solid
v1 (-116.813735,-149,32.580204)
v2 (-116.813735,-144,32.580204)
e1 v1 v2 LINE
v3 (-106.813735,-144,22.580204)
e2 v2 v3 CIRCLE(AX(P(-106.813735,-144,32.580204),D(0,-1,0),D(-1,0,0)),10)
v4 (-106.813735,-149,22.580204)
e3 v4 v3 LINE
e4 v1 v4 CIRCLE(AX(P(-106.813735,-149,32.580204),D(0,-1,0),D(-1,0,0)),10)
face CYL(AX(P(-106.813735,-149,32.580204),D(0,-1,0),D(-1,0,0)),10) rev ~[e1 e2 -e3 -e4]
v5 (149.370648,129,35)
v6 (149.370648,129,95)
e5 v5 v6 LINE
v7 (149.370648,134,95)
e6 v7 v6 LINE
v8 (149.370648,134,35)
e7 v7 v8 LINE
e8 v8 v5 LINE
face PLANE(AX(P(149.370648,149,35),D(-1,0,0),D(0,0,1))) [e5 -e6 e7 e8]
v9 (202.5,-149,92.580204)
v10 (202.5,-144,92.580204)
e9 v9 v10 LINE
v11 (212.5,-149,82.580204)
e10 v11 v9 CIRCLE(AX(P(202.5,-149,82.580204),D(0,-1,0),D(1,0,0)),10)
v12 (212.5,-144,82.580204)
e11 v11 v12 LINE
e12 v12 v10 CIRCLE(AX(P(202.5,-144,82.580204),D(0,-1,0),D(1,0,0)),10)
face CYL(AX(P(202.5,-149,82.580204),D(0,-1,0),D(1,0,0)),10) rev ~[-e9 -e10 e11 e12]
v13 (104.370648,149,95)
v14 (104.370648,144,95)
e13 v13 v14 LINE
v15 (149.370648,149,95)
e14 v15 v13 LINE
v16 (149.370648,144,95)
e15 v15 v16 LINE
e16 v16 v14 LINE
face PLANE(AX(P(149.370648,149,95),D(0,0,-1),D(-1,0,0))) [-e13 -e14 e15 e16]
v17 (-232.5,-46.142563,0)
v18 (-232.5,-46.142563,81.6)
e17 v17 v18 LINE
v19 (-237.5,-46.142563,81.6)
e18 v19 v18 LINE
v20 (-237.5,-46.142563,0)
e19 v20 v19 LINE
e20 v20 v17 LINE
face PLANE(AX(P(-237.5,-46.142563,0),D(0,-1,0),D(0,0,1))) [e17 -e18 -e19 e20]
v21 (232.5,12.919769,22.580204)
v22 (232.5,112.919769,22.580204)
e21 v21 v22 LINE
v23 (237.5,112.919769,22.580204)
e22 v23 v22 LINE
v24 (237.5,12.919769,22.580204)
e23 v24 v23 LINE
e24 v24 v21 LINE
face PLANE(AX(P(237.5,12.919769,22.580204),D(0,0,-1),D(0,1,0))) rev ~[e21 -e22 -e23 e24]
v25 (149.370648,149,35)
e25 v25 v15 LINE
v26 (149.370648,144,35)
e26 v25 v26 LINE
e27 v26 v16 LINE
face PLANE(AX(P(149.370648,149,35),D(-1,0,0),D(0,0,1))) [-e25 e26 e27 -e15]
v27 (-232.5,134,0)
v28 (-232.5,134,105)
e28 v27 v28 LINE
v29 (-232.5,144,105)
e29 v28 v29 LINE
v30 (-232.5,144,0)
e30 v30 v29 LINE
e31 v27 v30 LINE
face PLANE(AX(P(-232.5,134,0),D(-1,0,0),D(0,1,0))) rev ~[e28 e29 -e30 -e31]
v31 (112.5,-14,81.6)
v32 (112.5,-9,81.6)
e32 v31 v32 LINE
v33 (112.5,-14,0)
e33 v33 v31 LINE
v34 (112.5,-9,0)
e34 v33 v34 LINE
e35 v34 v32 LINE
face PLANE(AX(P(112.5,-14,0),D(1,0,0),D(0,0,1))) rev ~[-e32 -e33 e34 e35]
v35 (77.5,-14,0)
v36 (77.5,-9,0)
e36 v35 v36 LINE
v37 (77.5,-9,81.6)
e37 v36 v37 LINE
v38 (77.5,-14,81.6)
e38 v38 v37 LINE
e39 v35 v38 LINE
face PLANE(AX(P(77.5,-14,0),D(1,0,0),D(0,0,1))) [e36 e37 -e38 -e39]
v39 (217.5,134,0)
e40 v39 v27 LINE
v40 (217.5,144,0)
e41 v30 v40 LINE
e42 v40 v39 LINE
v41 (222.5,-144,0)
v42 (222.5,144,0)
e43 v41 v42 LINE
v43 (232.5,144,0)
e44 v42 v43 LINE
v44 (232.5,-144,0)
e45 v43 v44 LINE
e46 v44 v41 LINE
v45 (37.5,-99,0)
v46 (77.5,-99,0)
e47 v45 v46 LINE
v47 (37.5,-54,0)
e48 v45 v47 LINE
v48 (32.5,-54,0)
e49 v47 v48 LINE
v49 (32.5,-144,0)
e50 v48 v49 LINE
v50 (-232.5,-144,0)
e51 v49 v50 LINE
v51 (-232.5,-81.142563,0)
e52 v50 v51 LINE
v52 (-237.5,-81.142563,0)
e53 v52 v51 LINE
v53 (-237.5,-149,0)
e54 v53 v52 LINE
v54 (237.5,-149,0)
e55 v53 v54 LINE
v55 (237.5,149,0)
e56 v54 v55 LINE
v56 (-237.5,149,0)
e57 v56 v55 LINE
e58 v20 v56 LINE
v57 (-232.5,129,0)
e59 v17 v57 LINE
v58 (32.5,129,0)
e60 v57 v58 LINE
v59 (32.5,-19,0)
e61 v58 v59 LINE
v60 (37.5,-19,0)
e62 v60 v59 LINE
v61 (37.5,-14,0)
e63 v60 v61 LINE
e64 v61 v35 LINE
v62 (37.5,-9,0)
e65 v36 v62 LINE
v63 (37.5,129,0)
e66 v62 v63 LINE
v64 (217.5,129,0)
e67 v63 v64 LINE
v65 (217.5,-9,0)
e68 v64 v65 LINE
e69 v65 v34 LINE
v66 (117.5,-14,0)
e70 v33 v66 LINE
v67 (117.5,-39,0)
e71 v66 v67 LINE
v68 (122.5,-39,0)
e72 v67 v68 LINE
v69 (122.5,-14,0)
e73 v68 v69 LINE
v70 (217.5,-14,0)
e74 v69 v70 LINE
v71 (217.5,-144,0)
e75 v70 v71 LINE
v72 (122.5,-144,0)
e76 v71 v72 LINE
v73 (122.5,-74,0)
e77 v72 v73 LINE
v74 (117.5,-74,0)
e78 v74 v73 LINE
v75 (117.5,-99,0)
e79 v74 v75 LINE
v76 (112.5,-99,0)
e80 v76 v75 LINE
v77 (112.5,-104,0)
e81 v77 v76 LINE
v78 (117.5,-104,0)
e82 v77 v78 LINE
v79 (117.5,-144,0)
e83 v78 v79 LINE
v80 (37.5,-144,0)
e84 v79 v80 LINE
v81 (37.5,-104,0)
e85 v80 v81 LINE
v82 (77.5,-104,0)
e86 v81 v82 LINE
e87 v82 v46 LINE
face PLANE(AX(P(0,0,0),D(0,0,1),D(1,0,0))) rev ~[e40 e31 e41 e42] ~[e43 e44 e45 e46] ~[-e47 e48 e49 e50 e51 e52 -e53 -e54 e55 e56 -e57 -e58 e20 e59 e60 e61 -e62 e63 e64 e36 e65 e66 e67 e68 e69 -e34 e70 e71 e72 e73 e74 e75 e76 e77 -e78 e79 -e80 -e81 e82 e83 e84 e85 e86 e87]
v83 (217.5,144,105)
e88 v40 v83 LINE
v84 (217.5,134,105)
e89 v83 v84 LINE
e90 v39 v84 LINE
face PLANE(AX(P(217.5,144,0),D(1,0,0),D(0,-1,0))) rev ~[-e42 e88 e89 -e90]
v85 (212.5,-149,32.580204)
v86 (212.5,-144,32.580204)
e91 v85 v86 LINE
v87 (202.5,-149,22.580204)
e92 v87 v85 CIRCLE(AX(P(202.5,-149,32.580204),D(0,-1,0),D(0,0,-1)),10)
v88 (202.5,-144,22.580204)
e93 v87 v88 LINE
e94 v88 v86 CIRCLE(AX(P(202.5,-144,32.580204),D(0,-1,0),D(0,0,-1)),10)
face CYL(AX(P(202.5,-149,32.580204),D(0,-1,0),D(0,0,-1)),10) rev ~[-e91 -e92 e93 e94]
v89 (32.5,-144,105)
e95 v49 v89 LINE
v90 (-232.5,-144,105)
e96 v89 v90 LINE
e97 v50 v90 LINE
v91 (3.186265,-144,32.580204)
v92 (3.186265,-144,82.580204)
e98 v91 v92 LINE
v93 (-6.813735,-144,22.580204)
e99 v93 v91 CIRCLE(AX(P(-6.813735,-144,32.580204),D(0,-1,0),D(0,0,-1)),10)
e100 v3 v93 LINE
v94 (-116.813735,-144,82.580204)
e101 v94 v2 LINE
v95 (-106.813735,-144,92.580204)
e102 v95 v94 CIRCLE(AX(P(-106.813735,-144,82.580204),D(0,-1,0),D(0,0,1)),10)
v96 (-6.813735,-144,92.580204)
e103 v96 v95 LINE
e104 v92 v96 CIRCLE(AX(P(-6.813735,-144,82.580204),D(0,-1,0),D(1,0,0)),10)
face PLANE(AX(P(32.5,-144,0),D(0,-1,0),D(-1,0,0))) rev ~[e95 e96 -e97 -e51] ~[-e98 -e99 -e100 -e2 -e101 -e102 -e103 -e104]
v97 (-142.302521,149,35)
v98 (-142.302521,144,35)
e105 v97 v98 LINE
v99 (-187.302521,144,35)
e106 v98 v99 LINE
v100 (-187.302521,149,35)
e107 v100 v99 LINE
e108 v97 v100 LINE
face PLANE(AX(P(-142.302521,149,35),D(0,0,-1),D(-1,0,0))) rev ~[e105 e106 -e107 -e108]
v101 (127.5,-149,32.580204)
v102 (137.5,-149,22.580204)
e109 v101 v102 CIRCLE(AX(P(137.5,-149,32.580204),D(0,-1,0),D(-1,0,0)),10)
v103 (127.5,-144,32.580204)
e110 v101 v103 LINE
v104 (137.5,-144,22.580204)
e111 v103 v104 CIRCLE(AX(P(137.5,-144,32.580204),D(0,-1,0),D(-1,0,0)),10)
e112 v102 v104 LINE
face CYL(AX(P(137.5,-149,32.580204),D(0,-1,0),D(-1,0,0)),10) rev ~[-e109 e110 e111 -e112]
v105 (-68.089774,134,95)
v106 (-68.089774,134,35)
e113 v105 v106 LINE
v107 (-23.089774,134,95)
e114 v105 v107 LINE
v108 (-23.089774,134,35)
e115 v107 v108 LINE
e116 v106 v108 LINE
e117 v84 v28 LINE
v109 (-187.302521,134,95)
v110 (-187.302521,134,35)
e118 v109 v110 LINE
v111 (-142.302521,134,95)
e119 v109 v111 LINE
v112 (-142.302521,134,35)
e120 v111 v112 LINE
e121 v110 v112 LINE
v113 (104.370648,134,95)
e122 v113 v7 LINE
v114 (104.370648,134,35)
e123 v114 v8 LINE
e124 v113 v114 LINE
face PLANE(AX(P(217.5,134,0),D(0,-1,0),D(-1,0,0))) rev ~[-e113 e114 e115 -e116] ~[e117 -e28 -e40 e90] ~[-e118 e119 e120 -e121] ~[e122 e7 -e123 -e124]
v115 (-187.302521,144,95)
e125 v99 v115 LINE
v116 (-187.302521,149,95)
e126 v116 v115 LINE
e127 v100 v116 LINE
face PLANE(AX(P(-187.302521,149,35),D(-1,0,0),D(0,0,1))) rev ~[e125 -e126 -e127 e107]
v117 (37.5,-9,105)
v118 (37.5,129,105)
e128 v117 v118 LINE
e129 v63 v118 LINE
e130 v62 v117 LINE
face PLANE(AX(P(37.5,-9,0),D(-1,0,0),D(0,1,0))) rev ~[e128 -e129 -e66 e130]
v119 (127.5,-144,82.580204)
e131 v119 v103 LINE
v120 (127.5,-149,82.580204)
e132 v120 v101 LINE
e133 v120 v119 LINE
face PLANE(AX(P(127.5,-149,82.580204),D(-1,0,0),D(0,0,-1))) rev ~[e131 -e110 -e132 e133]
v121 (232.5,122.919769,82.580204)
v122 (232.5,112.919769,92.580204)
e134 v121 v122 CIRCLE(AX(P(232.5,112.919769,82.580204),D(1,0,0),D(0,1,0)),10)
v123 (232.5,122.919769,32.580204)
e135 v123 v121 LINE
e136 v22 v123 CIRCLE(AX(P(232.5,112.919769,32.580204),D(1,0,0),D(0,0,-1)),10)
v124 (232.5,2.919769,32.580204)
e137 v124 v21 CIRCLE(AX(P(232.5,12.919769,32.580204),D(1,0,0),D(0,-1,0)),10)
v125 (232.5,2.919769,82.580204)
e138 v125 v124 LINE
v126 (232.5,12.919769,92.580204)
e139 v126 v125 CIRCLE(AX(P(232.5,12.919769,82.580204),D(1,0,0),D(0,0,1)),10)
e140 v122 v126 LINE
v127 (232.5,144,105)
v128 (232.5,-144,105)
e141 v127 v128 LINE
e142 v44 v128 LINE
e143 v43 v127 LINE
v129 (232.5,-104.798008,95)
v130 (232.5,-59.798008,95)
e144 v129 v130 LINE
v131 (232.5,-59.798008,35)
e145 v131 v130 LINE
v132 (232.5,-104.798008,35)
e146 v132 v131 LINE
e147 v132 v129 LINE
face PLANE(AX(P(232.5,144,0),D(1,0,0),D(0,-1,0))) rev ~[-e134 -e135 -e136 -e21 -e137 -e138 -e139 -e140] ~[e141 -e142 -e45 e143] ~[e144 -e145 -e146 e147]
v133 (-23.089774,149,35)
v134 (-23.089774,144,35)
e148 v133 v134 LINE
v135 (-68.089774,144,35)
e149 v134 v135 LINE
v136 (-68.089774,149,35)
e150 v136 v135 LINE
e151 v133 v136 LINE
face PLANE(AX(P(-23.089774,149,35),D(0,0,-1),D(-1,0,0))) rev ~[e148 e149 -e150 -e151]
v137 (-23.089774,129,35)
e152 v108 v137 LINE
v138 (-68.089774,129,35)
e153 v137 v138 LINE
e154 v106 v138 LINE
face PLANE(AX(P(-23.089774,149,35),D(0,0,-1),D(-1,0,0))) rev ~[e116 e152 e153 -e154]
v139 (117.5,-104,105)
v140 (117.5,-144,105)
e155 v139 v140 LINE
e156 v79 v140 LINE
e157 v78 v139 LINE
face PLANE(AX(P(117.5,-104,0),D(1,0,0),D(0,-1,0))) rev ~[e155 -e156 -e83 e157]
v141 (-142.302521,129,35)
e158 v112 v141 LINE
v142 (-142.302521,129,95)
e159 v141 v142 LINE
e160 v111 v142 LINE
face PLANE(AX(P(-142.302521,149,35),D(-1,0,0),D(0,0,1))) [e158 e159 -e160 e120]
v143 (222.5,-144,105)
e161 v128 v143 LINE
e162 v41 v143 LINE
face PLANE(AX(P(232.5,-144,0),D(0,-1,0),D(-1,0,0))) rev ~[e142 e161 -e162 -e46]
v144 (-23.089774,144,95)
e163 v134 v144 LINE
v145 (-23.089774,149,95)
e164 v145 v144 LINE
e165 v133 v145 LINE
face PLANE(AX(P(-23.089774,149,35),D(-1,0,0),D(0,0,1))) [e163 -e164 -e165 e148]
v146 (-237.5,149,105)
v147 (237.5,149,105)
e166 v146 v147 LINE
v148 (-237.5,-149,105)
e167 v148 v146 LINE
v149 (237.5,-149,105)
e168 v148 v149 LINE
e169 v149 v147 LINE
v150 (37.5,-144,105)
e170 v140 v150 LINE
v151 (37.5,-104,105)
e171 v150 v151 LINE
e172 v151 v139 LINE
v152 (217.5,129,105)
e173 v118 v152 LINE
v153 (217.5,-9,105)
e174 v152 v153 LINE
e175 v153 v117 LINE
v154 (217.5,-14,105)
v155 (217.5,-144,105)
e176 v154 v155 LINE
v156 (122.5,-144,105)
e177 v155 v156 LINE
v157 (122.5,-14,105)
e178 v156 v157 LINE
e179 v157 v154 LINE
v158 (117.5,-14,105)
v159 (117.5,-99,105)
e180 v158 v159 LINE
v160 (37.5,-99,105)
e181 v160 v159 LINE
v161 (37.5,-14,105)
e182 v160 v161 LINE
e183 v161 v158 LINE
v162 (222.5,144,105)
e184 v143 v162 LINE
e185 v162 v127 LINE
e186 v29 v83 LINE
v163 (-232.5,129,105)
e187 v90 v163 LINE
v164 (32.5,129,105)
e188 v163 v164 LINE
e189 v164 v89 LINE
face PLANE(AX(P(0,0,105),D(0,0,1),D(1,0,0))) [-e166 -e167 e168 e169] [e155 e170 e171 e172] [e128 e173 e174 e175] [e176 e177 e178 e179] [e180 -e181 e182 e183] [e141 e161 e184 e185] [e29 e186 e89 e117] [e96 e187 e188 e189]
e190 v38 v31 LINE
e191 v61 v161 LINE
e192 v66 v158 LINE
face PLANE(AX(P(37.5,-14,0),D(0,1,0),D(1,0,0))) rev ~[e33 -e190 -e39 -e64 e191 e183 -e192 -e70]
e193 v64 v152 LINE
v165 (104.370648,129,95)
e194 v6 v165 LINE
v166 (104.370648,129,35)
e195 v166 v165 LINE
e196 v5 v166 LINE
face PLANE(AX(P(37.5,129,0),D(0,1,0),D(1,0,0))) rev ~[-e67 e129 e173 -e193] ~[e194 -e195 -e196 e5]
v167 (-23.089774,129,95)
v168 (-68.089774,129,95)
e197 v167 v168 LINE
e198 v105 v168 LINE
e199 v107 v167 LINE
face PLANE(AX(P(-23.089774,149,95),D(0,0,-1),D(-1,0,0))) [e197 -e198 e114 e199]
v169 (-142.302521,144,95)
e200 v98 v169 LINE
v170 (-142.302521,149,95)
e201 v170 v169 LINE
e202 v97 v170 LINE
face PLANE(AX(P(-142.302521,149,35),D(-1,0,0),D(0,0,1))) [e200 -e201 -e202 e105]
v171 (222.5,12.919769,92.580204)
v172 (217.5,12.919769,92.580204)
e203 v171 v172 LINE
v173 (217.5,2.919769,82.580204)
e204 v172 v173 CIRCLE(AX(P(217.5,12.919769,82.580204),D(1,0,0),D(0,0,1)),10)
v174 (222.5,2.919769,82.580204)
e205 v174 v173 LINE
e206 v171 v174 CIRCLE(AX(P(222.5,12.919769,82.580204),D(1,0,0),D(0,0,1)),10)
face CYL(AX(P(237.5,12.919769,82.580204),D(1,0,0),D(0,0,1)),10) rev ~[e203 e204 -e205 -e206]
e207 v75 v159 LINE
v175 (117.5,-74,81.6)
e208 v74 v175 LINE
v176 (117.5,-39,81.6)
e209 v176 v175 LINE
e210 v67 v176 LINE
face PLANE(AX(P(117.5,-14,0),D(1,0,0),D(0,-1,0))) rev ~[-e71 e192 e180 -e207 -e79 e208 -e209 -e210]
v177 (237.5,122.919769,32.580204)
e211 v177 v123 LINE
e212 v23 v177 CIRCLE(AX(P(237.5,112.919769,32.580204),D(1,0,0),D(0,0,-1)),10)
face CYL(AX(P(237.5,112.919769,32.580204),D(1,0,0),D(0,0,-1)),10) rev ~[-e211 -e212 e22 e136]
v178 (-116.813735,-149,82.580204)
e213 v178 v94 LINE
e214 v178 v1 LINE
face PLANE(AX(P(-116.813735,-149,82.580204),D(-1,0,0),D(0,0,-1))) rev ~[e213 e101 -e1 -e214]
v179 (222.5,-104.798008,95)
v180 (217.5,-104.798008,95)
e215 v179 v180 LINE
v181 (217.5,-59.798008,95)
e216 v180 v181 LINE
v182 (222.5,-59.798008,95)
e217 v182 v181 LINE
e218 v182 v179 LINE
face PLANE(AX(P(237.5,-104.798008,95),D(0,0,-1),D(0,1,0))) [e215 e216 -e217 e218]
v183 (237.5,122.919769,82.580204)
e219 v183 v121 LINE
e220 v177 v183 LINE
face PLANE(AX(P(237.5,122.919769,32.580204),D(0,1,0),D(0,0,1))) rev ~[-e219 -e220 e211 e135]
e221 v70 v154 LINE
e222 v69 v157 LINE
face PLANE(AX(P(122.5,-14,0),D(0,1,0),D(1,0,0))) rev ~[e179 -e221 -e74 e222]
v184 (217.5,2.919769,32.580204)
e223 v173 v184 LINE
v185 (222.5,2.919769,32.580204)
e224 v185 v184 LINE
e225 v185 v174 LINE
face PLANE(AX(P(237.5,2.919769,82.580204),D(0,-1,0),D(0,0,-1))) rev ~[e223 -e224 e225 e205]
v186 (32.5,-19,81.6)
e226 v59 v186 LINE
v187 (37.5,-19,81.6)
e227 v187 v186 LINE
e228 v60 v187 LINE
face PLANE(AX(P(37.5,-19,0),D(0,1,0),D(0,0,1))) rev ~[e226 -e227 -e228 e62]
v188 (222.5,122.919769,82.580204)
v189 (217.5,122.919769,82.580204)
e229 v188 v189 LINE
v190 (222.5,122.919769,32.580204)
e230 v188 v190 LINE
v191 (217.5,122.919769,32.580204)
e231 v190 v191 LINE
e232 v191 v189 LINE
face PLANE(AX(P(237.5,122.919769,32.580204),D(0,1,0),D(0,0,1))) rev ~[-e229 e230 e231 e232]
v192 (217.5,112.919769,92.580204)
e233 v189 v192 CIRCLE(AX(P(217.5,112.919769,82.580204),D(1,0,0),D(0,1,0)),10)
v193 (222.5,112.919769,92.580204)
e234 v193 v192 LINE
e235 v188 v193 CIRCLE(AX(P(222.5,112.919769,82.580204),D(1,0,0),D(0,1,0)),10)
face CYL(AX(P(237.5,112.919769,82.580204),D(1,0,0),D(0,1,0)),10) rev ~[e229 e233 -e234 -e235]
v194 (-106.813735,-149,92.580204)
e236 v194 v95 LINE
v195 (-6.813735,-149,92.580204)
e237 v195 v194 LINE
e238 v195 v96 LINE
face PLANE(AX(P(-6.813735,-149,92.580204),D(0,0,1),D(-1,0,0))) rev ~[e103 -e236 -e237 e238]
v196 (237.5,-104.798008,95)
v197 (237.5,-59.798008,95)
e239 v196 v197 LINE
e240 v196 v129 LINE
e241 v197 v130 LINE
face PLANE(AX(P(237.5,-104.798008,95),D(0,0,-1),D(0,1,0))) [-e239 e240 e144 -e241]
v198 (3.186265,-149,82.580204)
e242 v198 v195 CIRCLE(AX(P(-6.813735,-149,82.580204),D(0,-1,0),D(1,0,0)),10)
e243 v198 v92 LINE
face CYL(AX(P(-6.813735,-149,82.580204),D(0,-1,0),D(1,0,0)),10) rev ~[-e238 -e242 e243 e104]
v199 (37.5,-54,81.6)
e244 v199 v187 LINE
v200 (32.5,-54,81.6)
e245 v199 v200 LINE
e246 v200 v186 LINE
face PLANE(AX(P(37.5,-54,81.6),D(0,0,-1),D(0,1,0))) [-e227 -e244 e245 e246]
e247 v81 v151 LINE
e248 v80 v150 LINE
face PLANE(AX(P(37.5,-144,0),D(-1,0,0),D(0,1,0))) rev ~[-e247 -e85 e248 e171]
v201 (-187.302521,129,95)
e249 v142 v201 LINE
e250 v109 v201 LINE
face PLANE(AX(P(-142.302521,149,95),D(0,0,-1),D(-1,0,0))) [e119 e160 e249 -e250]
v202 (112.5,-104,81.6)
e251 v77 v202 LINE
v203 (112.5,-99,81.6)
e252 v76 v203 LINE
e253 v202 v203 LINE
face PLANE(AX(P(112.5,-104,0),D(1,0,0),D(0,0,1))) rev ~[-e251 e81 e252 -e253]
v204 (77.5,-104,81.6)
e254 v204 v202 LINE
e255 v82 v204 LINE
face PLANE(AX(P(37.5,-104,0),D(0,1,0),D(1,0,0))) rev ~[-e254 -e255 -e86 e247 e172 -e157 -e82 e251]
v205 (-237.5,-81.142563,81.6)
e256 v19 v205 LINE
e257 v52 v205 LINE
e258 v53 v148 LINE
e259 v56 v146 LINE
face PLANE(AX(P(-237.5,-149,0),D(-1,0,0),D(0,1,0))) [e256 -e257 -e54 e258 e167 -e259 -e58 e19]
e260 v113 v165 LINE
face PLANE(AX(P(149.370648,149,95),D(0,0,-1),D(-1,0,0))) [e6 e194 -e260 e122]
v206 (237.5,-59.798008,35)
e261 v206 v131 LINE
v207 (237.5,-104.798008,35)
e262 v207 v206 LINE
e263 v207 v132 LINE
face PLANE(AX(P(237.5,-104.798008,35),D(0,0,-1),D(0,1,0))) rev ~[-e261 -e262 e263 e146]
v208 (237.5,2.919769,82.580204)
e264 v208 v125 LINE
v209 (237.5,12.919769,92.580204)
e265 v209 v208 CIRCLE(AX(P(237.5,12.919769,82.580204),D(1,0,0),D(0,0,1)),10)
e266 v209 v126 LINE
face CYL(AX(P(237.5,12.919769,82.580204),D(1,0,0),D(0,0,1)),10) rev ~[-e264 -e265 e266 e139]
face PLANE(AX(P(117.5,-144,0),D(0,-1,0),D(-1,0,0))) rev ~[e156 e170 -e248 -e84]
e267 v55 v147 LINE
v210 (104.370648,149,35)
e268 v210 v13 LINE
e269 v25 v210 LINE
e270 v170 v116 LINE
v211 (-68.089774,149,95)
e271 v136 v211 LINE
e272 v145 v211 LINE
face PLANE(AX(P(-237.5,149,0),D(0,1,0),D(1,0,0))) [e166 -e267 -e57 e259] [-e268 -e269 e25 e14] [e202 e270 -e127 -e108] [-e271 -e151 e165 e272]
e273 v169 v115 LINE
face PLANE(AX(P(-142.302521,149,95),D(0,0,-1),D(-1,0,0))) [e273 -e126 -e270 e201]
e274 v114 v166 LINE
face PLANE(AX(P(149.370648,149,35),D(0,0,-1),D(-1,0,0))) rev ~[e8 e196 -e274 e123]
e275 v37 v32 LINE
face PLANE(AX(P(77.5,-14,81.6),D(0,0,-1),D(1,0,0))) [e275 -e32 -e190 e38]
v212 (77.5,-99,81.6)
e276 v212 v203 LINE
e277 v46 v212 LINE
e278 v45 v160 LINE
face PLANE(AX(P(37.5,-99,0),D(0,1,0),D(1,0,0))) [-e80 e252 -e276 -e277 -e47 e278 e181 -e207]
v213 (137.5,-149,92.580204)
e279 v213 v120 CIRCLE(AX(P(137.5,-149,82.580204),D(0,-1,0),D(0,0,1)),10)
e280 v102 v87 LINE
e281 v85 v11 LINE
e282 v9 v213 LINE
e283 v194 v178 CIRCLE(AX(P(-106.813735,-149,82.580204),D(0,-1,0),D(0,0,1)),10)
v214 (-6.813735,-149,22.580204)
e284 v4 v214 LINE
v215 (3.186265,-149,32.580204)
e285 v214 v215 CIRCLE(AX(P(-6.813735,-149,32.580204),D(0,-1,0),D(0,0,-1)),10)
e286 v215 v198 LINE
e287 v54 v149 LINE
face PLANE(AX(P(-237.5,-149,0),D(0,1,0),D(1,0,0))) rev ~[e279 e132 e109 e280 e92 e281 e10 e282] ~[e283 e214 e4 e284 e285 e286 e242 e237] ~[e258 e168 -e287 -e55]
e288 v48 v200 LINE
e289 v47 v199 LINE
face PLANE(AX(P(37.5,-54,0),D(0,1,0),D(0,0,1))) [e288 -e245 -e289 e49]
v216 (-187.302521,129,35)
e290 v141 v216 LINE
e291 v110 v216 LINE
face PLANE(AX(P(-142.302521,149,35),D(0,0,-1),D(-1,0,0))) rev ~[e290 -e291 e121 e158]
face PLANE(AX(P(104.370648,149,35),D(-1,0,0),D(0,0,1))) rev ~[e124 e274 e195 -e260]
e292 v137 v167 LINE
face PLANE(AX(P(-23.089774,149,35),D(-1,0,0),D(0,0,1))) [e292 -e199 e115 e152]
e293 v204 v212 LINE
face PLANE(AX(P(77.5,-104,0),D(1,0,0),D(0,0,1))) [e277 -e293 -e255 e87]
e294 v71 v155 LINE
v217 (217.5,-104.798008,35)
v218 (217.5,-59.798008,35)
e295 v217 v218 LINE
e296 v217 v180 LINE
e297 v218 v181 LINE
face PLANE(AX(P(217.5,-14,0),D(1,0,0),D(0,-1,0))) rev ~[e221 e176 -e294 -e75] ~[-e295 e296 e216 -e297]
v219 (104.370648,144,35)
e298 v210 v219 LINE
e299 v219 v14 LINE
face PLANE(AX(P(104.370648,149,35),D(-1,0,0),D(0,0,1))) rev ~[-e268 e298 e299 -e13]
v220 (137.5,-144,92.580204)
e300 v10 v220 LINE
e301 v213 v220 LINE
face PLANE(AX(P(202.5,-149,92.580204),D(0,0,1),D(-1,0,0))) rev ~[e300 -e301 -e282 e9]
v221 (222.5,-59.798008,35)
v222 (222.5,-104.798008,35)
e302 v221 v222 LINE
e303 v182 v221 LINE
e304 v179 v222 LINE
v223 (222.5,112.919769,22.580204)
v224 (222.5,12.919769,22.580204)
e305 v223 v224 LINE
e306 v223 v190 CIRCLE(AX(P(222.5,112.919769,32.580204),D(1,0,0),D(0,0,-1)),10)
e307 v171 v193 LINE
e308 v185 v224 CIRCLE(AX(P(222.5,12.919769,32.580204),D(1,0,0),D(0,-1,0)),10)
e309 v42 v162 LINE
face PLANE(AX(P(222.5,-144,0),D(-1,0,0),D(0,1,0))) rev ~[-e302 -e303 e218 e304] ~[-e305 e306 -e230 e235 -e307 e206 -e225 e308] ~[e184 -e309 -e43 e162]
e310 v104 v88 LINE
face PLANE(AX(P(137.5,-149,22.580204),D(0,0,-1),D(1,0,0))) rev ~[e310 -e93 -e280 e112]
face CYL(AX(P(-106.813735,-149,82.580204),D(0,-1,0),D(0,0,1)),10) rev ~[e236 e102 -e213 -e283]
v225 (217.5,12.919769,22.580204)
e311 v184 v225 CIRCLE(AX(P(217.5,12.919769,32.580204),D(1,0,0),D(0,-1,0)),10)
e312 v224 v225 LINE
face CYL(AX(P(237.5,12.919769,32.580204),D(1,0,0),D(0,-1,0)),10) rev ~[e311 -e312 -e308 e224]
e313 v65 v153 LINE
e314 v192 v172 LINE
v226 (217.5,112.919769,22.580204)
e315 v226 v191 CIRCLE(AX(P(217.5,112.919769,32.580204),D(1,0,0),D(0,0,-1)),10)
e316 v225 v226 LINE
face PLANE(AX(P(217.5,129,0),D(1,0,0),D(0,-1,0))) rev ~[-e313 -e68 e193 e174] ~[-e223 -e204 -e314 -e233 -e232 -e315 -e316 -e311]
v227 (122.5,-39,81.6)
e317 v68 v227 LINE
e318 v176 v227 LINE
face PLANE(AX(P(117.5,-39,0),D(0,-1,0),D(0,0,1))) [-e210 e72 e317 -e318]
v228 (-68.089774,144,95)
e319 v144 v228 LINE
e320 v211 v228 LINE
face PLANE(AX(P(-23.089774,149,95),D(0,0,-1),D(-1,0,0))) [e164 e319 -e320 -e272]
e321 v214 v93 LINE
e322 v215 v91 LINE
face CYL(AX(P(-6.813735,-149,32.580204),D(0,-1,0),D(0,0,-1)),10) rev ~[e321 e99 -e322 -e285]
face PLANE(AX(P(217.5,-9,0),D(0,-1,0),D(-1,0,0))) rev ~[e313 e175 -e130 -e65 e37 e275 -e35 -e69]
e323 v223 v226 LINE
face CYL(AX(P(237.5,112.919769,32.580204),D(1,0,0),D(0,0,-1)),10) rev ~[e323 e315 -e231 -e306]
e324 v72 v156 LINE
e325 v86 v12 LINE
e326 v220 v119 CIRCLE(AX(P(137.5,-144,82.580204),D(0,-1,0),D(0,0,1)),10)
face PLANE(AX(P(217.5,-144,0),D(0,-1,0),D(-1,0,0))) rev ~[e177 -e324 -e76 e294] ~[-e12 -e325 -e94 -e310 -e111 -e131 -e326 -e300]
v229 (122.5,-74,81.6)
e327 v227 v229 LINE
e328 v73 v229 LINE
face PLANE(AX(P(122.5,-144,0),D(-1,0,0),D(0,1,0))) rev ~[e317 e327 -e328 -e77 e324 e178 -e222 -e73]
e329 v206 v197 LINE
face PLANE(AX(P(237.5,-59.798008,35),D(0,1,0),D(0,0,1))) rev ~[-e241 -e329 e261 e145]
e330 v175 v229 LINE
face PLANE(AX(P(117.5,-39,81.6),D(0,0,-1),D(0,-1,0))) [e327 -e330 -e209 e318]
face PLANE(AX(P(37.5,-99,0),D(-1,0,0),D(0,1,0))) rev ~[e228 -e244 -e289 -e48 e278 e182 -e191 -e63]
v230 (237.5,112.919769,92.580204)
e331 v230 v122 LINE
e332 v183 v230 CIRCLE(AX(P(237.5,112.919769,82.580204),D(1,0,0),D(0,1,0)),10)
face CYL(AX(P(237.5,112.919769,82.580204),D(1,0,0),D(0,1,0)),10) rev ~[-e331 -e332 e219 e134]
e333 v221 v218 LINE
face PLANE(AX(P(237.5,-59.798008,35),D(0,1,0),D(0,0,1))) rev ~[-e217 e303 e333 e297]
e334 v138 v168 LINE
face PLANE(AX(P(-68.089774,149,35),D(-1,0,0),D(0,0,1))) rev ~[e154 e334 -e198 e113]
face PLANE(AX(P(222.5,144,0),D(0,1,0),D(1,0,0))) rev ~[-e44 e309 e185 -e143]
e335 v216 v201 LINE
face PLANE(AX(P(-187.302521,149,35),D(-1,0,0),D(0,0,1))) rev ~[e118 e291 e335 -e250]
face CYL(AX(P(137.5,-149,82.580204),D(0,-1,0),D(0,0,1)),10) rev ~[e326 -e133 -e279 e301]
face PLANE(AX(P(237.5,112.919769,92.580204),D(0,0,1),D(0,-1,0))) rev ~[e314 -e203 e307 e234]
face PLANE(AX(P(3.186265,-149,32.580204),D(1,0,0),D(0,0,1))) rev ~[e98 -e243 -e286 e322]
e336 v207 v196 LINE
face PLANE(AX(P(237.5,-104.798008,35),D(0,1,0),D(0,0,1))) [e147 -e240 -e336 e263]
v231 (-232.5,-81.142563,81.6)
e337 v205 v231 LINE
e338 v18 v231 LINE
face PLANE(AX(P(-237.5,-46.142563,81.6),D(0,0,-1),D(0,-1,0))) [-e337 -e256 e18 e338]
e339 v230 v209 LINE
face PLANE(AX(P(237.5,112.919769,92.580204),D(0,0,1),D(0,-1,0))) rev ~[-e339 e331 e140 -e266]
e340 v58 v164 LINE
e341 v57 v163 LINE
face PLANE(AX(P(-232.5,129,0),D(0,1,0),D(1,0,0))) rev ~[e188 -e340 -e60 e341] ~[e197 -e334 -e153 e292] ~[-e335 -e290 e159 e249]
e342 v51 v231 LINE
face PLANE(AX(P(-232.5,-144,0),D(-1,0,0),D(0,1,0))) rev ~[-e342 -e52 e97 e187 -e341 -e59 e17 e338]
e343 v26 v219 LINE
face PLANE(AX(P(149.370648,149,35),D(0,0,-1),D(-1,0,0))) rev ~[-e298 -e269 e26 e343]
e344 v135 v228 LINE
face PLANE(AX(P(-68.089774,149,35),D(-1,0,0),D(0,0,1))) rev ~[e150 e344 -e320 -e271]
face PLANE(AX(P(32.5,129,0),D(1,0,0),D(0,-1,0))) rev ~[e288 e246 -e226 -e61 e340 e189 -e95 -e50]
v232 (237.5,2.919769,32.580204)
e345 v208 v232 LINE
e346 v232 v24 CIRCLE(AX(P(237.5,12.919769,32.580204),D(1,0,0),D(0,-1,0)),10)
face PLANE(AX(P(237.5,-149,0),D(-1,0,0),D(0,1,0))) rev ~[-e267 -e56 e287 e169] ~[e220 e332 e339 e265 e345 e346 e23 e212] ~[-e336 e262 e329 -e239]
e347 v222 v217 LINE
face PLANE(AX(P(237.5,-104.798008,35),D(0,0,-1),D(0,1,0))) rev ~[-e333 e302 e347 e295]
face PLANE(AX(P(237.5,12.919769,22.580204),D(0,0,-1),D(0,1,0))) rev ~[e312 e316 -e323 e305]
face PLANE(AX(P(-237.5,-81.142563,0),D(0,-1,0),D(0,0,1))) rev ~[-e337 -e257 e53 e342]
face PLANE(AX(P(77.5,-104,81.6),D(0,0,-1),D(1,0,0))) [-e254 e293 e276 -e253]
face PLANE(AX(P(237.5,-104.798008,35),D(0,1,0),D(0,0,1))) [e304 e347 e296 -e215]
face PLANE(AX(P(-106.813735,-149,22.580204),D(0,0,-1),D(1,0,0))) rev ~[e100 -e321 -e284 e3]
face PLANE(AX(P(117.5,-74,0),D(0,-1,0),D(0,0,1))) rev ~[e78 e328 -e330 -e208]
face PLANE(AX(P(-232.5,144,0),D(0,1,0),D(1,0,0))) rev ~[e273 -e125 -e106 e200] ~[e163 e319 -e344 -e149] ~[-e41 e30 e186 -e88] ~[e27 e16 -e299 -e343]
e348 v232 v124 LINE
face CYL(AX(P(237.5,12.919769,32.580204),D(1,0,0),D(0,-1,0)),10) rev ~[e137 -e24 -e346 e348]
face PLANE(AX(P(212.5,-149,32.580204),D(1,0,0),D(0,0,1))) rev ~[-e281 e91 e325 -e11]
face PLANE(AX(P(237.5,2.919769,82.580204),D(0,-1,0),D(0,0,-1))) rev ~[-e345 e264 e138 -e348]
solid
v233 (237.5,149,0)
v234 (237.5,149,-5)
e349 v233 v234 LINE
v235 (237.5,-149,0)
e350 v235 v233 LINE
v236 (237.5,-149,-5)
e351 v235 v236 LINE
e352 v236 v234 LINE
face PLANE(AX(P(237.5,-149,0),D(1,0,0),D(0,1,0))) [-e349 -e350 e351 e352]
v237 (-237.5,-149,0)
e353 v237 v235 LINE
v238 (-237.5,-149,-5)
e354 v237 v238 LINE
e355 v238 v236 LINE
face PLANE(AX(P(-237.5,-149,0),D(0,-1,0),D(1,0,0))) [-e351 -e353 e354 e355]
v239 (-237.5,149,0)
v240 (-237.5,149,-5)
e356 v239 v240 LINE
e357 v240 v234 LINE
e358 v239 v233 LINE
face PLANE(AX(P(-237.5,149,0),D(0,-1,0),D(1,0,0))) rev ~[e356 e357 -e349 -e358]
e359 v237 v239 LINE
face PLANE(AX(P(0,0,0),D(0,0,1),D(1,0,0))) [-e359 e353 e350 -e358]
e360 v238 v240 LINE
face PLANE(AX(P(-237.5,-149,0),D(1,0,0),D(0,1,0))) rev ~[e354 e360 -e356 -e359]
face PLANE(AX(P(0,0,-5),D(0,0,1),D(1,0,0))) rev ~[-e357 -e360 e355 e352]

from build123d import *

# Parameters (mm, degrees)
F0_W      = 475
F0_H      = 298
F1_DEPTH  = 5
F2_W      = 475
F2_H      = 298
F2_W_2    = 80
F2_H_2    = 5
F3_DEPTH  = 105
F4_W      = 45
F4_H      = 60
F5_DEPTH  = 20
F7_DEPTH  = 5
F8_W      = 45
F8_H      = 60
F9_DEPTH  = 20
F10_W     = 35
F10_H     = 81.6
F11_DEPTH = 5
F12_W     = 35
F12_H     = 81.6
F13_DEPTH = 5
F14_W     = 35
F14_H     = 81.6
F15_DEPTH = 5
F16_W     = 35
F16_H     = 81.6
F17_DEPTH = 5
F18_W     = 35
F18_H     = 81.6
F19_DEPTH = 5


# Not quite as in the source:
# - a feature names something its author has since deleted; it is built from what else it names


with BuildPart() as f1:
    # F0 (on Top) → F1 (new body)
    with BuildSketch(Plane.XY):
        Rectangle(F0_W, F0_H)
    extrude(amount=-F1_DEPTH)


with BuildPart() as f3:
    # F2 (on face) → F3 (new body)
    with BuildSketch(Plane.XY):
        Rectangle(F2_W, F2_H)
        Polygon((232.5, 144), (232.5, -144), (222.5, -144), (217.5, -144), (122.5, -144), (117.5, -144), (37.5, -144), (32.5, -144), (-232.5, -144), (-232.5, 129), (-232.5, 134), (-232.5, 144), (217.5, 144), (222.5, 144), align=None, mode=Mode.SUBTRACT)
        Polygon((217.5, 129), (217.5, 134), (-232.5, 134), (-232.5, 129), (32.5, 129), (37.5, 129), align=None)
        Polygon((32.5, -144), (37.5, -144), (37.5, -104), (37.5, -99), (37.5, -14), (37.5, -9), (37.5, 129), (32.5, 129), align=None)
        Polygon((217.5, -144), (222.5, -144), (222.5, 144), (217.5, 144), (217.5, 134), (217.5, 129), (217.5, -9), (217.5, -14), align=None)
        Polygon((117.5, -144), (122.5, -144), (122.5, -14), (117.5, -14), (117.5, -99), (117.5, -104), align=None)
        Polygon((122.5, -14), (217.5, -14), (217.5, -9), (37.5, -9), (37.5, -14), (117.5, -14), align=None)
        with Locations((77.5, -101.5)):
            Rectangle(F2_W_2, F2_H_2)
    extrude(amount=F3_DEPTH)

    # F4 (on face) → F5 (cut, through all)
    with BuildSketch(Plane(origin=(0, 149, 0), x_dir=(-1, 0, 0), z_dir=(0, 1, 0))):
        with Locations((164.8025205731, 65)):
            Rectangle(F4_W, F4_H)
        with Locations((-126.8706479669, 65)):
            Rectangle(F4_W, F4_H)
        with Locations((45.589773953, 65)):
            Rectangle(F4_W, F4_H)
    extrude(amount=-F5_DEPTH, mode=Mode.SUBTRACT)

    # F6 (on face) → F7 (cut, through all)
    with BuildSketch(Plane.XZ.offset(149)):
        with BuildLine():
            ThreePointArc((3.1862647831, 82.5802037477), (0.257332595, 89.6512715596), (-6.8137352169, 92.5802037477))
            Line((-6.8137352169, 92.5802037477), (-106.8137352169, 92.5802037477))
            ThreePointArc((-106.8137352169, 92.5802037477), (-113.8848030287, 89.6512715596), (-116.8137352169, 82.5802037477))
            Line((-116.8137352169, 82.5802037477), (-116.8137352169, 32.5802037477))
            ThreePointArc((-116.8137352169, 32.5802037477), (-113.8848030287, 25.5091359359), (-106.8137352169, 22.5802037477))
            Line((-106.8137352169, 22.5802037477), (-6.8137352169, 22.5802037477))
            ThreePointArc((-6.8137352169, 22.5802037477), (0.257332595, 25.5091359359), (3.1862647831, 32.5802037477))
            Line((3.1862647831, 32.5802037477), (3.1862647831, 82.5802037477))
        make_face()
        with BuildLine():
            Line((202.5, 92.5802037477), (137.5, 92.5802037477))
            ThreePointArc((137.5, 92.5802037477), (130.4289321881, 89.6512715596), (127.5, 82.5802037477))
            Line((127.5, 82.5802037477), (127.5, 32.5802037477))
            ThreePointArc((127.5, 32.5802037477), (130.4289321881, 25.5091359359), (137.5, 22.5802037477))
            Line((137.5, 22.5802037477), (202.5, 22.5802037477))
            ThreePointArc((202.5, 22.5802037477), (209.5710678119, 25.5091359359), (212.5, 32.5802037477))
            Line((212.5, 32.5802037477), (212.5, 82.5802037477))
            ThreePointArc((212.5, 82.5802037477), (209.5710678119, 89.6512715596), (202.5, 92.5802037477))
        make_face()
    extrude(amount=-F7_DEPTH, mode=Mode.SUBTRACT)

    # F8 (on face) → F9 (cut, through all)
    with BuildSketch(Plane.YZ.offset(237.5)):
        with Locations((-82.2980084391, 65)):
            Rectangle(F8_W, F8_H)
        with BuildLine():
            Line((112.9197687081, 92.5802037477), (12.9197687081, 92.5802037477))
            ThreePointArc((12.9197687081, 92.5802037477), (5.8487008962, 89.6512715596), (2.9197687081, 82.5802037477))
            Line((2.9197687081, 82.5802037477), (2.9197687081, 32.5802037477))
            ThreePointArc((2.9197687081, 32.5802037477), (5.8487008962, 25.5091359359), (12.9197687081, 22.5802037477))
            Line((12.9197687081, 22.5802037477), (112.9197687081, 22.5802037477))
            ThreePointArc((112.9197687081, 22.5802037477), (119.9908365199, 25.5091359359), (122.9197687081, 32.5802037477))
            Line((122.9197687081, 32.5802037477), (122.9197687081, 82.5802037477))
            ThreePointArc((122.9197687081, 82.5802037477), (119.9908365199, 89.6512715596), (112.9197687081, 92.5802037477))
        make_face()
    extrude(amount=-F9_DEPTH, mode=Mode.SUBTRACT)

    # F10 (on face) → F11 (cut, through all)
    with BuildSketch(Plane.YZ.offset(37.5)):
        with Locations((-36.5, 40.8)):
            Rectangle(F10_W, F10_H)
    extrude(amount=-F11_DEPTH, mode=Mode.SUBTRACT)

    # F12 (on face) → F13 (cut, through all)
    with BuildSketch(Plane(origin=(117.5, 0, 0), x_dir=(0, -1, 0), z_dir=(-1, 0, 0))):
        with Locations((56.5, 40.8)):
            Rectangle(F12_W, F12_H)
    extrude(amount=-F13_DEPTH, mode=Mode.SUBTRACT)

    # F14 (on face) → F15 (cut, through all)
    with BuildSketch(Plane.XZ.offset(104)):
        with Locations((95, 40.8)):
            Rectangle(F14_W, F14_H)
    extrude(amount=-F15_DEPTH, mode=Mode.SUBTRACT)

    # F16 (on face) → F17 (cut, through all)
    with BuildSketch(Plane.XZ.offset(14)):
        with Locations((95, 40.8)):
            Rectangle(F16_W, F16_H)
    extrude(amount=-F17_DEPTH, mode=Mode.SUBTRACT)

    # F18 (on face) → F19 (cut, through all)
    with BuildSketch(Plane(origin=(-237.5, 0, 0), x_dir=(0, -1, 0), z_dir=(-1, 0, 0))):
        with Locations((63.6425632238, 40.8)):
            Rectangle(F18_W, F18_H)
    extrude(amount=-F19_DEPTH, mode=Mode.SUBTRACT)


solid = Compound([f1.part, f3.part])
